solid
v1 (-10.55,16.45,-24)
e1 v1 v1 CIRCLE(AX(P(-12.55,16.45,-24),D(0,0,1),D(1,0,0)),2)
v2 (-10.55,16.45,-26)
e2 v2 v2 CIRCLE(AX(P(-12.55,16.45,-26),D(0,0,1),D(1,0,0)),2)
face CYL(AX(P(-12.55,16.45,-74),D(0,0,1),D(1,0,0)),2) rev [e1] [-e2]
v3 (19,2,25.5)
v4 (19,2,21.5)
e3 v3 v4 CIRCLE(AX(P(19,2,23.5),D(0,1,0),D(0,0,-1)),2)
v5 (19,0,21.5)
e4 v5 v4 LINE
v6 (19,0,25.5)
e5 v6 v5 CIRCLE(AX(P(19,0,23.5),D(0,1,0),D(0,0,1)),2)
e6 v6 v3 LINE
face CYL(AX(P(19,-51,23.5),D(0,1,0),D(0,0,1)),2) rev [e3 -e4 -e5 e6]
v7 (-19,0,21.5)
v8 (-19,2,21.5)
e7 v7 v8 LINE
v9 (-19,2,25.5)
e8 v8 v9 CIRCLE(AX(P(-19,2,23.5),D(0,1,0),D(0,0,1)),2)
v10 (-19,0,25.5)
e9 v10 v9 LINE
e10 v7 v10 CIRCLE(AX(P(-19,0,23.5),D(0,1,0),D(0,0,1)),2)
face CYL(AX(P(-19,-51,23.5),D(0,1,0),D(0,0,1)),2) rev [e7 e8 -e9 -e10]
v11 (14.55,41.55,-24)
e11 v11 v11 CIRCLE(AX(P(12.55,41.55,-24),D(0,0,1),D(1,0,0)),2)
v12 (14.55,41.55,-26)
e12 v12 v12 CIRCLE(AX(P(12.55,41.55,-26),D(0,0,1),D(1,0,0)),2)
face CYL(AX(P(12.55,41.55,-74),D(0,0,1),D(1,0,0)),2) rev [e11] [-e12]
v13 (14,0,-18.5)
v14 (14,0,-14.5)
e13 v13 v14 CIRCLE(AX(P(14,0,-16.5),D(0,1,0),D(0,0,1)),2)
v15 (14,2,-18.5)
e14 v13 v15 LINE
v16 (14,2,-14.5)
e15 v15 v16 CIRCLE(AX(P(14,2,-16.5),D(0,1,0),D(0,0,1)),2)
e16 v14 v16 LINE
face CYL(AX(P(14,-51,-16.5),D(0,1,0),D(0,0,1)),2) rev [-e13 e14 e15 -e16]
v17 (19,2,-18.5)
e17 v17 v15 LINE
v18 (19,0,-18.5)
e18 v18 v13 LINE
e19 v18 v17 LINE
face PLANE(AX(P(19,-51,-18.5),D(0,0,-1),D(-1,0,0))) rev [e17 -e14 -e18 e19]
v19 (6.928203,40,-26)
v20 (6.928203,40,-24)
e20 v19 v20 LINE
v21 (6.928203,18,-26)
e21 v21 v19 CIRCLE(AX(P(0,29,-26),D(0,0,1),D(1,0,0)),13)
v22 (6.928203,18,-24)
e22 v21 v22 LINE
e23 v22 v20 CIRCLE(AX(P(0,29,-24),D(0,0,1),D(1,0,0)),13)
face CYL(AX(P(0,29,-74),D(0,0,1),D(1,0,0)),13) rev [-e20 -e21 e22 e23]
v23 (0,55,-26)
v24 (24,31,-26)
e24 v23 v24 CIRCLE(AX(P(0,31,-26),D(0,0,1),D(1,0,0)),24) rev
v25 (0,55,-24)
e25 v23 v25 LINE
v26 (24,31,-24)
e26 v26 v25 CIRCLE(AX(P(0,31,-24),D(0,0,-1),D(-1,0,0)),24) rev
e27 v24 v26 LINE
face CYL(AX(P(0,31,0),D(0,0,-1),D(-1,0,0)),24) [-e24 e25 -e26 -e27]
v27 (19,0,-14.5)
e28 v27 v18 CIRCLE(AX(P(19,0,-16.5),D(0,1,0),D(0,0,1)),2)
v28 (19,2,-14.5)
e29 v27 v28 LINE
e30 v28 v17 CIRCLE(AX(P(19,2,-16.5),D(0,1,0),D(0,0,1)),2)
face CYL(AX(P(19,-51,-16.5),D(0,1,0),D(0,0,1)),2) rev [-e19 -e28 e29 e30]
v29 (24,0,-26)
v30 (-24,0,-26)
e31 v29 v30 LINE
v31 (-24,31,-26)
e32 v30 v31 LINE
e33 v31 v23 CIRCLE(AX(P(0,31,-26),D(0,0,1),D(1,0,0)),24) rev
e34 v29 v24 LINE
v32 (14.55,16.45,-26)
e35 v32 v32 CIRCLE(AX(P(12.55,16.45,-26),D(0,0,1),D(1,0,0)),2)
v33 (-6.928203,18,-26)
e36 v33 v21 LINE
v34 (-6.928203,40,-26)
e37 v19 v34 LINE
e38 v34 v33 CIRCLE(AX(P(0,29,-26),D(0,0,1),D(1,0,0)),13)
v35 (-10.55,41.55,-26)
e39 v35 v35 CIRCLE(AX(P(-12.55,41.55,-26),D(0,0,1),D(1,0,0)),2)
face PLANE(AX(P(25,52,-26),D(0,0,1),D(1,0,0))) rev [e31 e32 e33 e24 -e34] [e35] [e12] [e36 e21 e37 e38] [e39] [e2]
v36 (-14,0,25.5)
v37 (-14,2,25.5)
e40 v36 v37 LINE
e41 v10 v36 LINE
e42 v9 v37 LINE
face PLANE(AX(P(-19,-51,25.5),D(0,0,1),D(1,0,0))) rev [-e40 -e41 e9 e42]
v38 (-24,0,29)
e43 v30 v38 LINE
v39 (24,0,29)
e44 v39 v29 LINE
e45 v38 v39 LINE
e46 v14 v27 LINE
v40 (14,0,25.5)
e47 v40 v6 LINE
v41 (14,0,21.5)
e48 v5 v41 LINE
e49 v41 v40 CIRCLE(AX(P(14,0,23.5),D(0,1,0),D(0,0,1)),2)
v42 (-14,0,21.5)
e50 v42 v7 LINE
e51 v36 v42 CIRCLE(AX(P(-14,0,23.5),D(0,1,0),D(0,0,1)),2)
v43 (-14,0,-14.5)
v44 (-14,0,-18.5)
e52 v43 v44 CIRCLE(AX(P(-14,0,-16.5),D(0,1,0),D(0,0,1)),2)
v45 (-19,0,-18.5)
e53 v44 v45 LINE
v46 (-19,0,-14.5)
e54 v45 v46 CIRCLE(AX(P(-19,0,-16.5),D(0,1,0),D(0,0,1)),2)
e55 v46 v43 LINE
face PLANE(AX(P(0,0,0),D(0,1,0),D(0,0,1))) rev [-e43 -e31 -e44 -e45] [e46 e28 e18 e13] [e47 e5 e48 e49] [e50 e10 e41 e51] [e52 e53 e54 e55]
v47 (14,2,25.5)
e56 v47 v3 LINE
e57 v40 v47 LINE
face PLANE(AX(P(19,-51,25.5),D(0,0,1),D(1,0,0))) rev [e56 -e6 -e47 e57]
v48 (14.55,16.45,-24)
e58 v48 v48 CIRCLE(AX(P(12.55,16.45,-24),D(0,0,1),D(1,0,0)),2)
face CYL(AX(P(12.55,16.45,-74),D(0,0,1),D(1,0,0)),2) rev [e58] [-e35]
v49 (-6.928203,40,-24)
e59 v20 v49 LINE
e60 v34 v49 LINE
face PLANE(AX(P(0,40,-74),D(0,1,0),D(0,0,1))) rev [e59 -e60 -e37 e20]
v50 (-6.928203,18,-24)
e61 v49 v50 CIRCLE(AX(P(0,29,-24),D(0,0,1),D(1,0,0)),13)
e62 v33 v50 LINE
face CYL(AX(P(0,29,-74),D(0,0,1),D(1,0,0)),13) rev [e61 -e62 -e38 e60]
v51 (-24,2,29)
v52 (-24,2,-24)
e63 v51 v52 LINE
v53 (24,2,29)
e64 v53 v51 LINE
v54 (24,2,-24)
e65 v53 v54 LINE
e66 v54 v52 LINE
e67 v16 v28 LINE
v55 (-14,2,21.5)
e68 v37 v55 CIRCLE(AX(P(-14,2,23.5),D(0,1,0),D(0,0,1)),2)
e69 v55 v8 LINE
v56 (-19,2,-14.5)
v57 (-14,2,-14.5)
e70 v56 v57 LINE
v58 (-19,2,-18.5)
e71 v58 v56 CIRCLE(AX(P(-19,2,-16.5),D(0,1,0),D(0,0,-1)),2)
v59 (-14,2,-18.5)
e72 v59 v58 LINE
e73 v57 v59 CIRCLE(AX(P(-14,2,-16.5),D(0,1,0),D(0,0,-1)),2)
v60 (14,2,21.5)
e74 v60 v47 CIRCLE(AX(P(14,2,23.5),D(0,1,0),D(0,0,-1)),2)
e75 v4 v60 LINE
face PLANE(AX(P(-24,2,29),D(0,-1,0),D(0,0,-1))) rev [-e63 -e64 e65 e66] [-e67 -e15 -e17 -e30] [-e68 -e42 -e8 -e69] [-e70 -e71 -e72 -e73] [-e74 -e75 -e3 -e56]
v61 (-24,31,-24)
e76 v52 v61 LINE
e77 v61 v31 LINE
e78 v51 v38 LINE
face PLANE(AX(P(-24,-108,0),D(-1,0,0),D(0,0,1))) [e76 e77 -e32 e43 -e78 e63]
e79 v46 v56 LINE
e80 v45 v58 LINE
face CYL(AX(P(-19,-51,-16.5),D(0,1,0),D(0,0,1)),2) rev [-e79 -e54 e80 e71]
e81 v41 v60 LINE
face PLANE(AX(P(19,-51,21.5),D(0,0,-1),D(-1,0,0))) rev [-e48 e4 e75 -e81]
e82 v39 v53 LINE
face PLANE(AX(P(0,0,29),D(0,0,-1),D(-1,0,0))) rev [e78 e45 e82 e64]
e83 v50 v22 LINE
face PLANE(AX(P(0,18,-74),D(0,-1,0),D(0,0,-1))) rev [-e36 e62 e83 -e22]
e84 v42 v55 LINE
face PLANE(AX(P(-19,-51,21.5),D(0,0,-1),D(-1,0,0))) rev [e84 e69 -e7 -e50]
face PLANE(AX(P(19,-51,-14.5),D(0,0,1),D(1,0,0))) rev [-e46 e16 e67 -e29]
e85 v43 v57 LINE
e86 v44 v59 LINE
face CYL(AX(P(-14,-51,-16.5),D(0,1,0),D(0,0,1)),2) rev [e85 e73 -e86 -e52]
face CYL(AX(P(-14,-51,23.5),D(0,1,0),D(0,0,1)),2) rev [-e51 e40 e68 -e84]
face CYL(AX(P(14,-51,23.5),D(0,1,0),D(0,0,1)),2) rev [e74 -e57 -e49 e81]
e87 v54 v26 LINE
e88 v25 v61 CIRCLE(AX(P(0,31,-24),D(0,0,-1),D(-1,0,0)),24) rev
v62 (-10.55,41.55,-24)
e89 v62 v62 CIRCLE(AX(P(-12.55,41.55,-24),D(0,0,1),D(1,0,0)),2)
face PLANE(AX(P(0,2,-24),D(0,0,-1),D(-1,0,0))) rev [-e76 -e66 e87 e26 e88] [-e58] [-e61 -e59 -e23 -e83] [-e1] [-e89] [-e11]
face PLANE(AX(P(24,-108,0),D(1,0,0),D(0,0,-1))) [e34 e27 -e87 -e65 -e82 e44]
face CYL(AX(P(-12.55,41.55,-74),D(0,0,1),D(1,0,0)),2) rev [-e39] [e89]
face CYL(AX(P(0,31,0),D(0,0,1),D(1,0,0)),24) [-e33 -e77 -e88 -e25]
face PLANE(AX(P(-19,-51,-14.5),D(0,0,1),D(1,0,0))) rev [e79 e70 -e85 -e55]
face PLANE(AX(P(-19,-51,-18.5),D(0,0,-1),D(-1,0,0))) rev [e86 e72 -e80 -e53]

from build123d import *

# Parameters (mm, degrees)
SKETCH2_W           = 50
SKETCH2_H           = 52
BOSS_EXTRUDE1_DEPTH = 52
SKETCH3_W           = 50
SKETCH3_H           = 50
CUT_EXTRUDE1_DEPTH  = 50
CUT_EXTRUDE3_DEPTH  = 50
SKETCH5_R           = 2
CUT_EXTRUDE4_DEPTH  = 50
SKETCH7_W           = 52
SKETCH7_H           = 2
BOSS_EXTRUDE2_DEPTH = 5
SKETCH8_R           = 2.5
CUT_EXTRUDE6_DEPTH  = 5
SKETCH10_W          = 1
SKETCH10_H          = 2
CUT_EXTRUDE7_DEPTH  = 160
SKETCH11_W          = 48
SKETCH11_H          = 2
BOSS_EXTRUDE3_DEPTH = 3
SKETCH12_W          = 48
SKETCH12_H          = 2
BOSS_EXTRUDE4_DEPTH = 53
CUT_EXTRUDE9_DEPTH  = 53
FILLET1_R           = 24
FILLET2_R           = 24


with BuildPart() as part:
    # Sketch2 → Boss-Extrude1 (new body)
    with BuildSketch(Plane(origin=(0, 0, 0), x_dir=(1, 0, 0), z_dir=(0, 1, 0))):
        Rectangle(SKETCH2_W, SKETCH2_H)
    extrude(amount=BOSS_EXTRUDE1_DEPTH)

    # Sketch3 → Cut-Extrude1 (cut)
    with BuildSketch(Plane(origin=(0, 52, 0), x_dir=(1, 0, 0), z_dir=(0, 1, 0))):
        with Locations((0, -1)):
            Rectangle(SKETCH3_W, SKETCH3_H)
    extrude(amount=-CUT_EXTRUDE1_DEPTH, mode=Mode.SUBTRACT)

    # Sketch4 → Cut-Extrude3 (cut)
    with BuildSketch(Plane.XY.offset(-24)):
        with BuildLine():
            Line((-6.92820323, 18), (0, 18))
            Line((0, 18), (0, 24))
            ThreePointArc((0, 24), (-5, 29), (0, 34))
            Line((0, 34), (0, 40))
            Line((0, 40), (-6.92820323, 40))
            ThreePointArc((-6.92820323, 40), (-13, 29), (-6.92820323, 18))
        make_face()
        with BuildLine():
            Line((0, 24), (0, 18))
            Line((0, 18), (6.92820323, 18))
            ThreePointArc((6.92820323, 18), (13, 29), (6.92820323, 40))
            Line((6.92820323, 40), (0, 40))
            Line((0, 40), (0, 34))
            ThreePointArc((0, 34), (3.535533906, 32.535533906), (5, 29))
            ThreePointArc((5, 29), (3.535533906, 25.464466094), (0, 24))
        make_face()
    extrude(amount=-CUT_EXTRUDE3_DEPTH, mode=Mode.SUBTRACT)


with BuildPart() as body_2:
    # of the pieces the cut leaves, the one that is kept (cut_extrude3_keep)
    add(part.part.solids().sort_by_distance((25, 0, 26))[0])

    # Sketch5 → Cut-Extrude4 (cut)
    with BuildSketch(Plane.XY.offset(-24)):
        with Locations((12.55, 41.55)):
            Circle(SKETCH5_R)
        with Locations((-12.55, 41.55)):
            Circle(SKETCH5_R)
        with Locations((12.55, 16.45)):
            Circle(SKETCH5_R)
        with Locations((-12.55, 16.45)):
            Circle(SKETCH5_R)
    extrude(amount=-CUT_EXTRUDE4_DEPTH, mode=Mode.SUBTRACT)

    # Sketch7 → Boss-Extrude2 (add)
    with BuildSketch(Plane(origin=(25, 0, 0), x_dir=(0, 0, -1), z_dir=(1, 0, 0))):
        with Locations((0, 1)):
            Rectangle(SKETCH7_W, SKETCH7_H)
    boss_extrude2 = extrude(amount=BOSS_EXTRUDE2_DEPTH)

    # Mirror1: Boss-Extrude2 across plane
    add(boss_extrude2.mirror(Plane(origin=(0, 0, 0), x_dir=(0, 0, 1), z_dir=(1, 0, 0))))

    # Sketch8 → Cut-Extrude6 (cut)
    with BuildSketch(Plane(origin=(0, 2, 0), x_dir=(1, 0, 0), z_dir=(0, 1, 0))):
        with Locations(Location((-26.5, 14, 0), (0, 0, 270))):
            Circle(SKETCH8_R)
        with Locations(Location((-26.5, -16, 0), (0, 0, 270))):
            Circle(SKETCH8_R)
        with Locations(Location((26.5, 14, 0), (0, 0, 270))):
            Circle(SKETCH8_R)
        with Locations(Location((26.5, -16, 0), (0, 0, 270))):
            Circle(SKETCH8_R)
    extrude(amount=-CUT_EXTRUDE6_DEPTH, mode=Mode.SUBTRACT)

    # Sketch10 → Cut-Extrude7 (cut)
    with BuildSketch(Plane(origin=(0, 52, 0), x_dir=(1, 0, 0), z_dir=(0, 1, 0))):
        Polygon((25, 24), (24, 24), (-24, 24), (-25, 24), (-25, 26), (-30, 26), (-30, -26), (30, -26), (30, 26), (25, 26), align=None)
        with Locations((-24.5, 25)):
            Rectangle(SKETCH10_W, SKETCH10_H)
        with Locations((24.5, 25)):
            Rectangle(SKETCH10_W, SKETCH10_H)
    extrude(amount=-CUT_EXTRUDE7_DEPTH, mode=Mode.SUBTRACT)

    # Sketch11 → Boss-Extrude3 (add)
    with BuildSketch(Plane(origin=(0, 52, 0), x_dir=(1, 0, 0), z_dir=(0, 1, 0))):
        with Locations((0, 25)):
            Rectangle(SKETCH11_W, SKETCH11_H)
    extrude(amount=BOSS_EXTRUDE3_DEPTH)

    # Sketch12 → Boss-Extrude4 (add)
    with BuildSketch(Plane.XY.offset(-24)):
        with Locations((0, 1)):
            Rectangle(SKETCH12_W, SKETCH12_H)
    extrude(amount=BOSS_EXTRUDE4_DEPTH)

    # Sketch13 → Cut-Extrude9 (cut)
    with BuildSketch(Plane(origin=(0, 2, 0), x_dir=(1, 0, 0), z_dir=(0, 1, 0))):
        with BuildLine():
            Line((19, 14.5), (14, 14.5))
            ThreePointArc((14, 14.5), (12, 16.5), (14, 18.5))
            Line((14, 18.5), (19, 18.5))
            ThreePointArc((19, 18.5), (21, 16.5), (19, 14.5))
        make_face()
        with BuildLine():
            Line((-19, 14.5), (-14, 14.5))
            ThreePointArc((-14, 14.5), (-12, 16.5), (-14, 18.5))
            Line((-14, 18.5), (-19, 18.5))
            ThreePointArc((-19, 18.5), (-21, 16.5), (-19, 14.5))
        make_face()
        with BuildLine():
            Line((-19, -21.5), (-14, -21.5))
            ThreePointArc((-14, -21.5), (-12, -23.5), (-14, -25.5))
            Line((-14, -25.5), (-19, -25.5))
            ThreePointArc((-19, -25.5), (-21, -23.5), (-19, -21.5))
        make_face()
        with BuildLine():
            Line((19, -21.5), (14, -21.5))
            ThreePointArc((14, -21.5), (12, -23.5), (14, -25.5))
            Line((14, -25.5), (19, -25.5))
            ThreePointArc((19, -25.5), (21, -23.5), (19, -21.5))
        make_face()
    extrude(amount=-CUT_EXTRUDE9_DEPTH, mode=Mode.SUBTRACT)

    # Fillet1
    fillet1_edges = [body_2.edges().sort_by_distance(p)[0] for p in [
        (-24, 55, -25),
    ]]
    fillet(fillet1_edges, radius=FILLET1_R)

    # Fillet2
    fillet2_edges = [body_2.edges().sort_by_distance(p)[0] for p in [
        (24, 55, -25),
    ]]
    fillet(fillet2_edges, radius=FILLET2_R - 0.0001)  # a hair under: the kernel refuses the full size


solid = body_2.part
